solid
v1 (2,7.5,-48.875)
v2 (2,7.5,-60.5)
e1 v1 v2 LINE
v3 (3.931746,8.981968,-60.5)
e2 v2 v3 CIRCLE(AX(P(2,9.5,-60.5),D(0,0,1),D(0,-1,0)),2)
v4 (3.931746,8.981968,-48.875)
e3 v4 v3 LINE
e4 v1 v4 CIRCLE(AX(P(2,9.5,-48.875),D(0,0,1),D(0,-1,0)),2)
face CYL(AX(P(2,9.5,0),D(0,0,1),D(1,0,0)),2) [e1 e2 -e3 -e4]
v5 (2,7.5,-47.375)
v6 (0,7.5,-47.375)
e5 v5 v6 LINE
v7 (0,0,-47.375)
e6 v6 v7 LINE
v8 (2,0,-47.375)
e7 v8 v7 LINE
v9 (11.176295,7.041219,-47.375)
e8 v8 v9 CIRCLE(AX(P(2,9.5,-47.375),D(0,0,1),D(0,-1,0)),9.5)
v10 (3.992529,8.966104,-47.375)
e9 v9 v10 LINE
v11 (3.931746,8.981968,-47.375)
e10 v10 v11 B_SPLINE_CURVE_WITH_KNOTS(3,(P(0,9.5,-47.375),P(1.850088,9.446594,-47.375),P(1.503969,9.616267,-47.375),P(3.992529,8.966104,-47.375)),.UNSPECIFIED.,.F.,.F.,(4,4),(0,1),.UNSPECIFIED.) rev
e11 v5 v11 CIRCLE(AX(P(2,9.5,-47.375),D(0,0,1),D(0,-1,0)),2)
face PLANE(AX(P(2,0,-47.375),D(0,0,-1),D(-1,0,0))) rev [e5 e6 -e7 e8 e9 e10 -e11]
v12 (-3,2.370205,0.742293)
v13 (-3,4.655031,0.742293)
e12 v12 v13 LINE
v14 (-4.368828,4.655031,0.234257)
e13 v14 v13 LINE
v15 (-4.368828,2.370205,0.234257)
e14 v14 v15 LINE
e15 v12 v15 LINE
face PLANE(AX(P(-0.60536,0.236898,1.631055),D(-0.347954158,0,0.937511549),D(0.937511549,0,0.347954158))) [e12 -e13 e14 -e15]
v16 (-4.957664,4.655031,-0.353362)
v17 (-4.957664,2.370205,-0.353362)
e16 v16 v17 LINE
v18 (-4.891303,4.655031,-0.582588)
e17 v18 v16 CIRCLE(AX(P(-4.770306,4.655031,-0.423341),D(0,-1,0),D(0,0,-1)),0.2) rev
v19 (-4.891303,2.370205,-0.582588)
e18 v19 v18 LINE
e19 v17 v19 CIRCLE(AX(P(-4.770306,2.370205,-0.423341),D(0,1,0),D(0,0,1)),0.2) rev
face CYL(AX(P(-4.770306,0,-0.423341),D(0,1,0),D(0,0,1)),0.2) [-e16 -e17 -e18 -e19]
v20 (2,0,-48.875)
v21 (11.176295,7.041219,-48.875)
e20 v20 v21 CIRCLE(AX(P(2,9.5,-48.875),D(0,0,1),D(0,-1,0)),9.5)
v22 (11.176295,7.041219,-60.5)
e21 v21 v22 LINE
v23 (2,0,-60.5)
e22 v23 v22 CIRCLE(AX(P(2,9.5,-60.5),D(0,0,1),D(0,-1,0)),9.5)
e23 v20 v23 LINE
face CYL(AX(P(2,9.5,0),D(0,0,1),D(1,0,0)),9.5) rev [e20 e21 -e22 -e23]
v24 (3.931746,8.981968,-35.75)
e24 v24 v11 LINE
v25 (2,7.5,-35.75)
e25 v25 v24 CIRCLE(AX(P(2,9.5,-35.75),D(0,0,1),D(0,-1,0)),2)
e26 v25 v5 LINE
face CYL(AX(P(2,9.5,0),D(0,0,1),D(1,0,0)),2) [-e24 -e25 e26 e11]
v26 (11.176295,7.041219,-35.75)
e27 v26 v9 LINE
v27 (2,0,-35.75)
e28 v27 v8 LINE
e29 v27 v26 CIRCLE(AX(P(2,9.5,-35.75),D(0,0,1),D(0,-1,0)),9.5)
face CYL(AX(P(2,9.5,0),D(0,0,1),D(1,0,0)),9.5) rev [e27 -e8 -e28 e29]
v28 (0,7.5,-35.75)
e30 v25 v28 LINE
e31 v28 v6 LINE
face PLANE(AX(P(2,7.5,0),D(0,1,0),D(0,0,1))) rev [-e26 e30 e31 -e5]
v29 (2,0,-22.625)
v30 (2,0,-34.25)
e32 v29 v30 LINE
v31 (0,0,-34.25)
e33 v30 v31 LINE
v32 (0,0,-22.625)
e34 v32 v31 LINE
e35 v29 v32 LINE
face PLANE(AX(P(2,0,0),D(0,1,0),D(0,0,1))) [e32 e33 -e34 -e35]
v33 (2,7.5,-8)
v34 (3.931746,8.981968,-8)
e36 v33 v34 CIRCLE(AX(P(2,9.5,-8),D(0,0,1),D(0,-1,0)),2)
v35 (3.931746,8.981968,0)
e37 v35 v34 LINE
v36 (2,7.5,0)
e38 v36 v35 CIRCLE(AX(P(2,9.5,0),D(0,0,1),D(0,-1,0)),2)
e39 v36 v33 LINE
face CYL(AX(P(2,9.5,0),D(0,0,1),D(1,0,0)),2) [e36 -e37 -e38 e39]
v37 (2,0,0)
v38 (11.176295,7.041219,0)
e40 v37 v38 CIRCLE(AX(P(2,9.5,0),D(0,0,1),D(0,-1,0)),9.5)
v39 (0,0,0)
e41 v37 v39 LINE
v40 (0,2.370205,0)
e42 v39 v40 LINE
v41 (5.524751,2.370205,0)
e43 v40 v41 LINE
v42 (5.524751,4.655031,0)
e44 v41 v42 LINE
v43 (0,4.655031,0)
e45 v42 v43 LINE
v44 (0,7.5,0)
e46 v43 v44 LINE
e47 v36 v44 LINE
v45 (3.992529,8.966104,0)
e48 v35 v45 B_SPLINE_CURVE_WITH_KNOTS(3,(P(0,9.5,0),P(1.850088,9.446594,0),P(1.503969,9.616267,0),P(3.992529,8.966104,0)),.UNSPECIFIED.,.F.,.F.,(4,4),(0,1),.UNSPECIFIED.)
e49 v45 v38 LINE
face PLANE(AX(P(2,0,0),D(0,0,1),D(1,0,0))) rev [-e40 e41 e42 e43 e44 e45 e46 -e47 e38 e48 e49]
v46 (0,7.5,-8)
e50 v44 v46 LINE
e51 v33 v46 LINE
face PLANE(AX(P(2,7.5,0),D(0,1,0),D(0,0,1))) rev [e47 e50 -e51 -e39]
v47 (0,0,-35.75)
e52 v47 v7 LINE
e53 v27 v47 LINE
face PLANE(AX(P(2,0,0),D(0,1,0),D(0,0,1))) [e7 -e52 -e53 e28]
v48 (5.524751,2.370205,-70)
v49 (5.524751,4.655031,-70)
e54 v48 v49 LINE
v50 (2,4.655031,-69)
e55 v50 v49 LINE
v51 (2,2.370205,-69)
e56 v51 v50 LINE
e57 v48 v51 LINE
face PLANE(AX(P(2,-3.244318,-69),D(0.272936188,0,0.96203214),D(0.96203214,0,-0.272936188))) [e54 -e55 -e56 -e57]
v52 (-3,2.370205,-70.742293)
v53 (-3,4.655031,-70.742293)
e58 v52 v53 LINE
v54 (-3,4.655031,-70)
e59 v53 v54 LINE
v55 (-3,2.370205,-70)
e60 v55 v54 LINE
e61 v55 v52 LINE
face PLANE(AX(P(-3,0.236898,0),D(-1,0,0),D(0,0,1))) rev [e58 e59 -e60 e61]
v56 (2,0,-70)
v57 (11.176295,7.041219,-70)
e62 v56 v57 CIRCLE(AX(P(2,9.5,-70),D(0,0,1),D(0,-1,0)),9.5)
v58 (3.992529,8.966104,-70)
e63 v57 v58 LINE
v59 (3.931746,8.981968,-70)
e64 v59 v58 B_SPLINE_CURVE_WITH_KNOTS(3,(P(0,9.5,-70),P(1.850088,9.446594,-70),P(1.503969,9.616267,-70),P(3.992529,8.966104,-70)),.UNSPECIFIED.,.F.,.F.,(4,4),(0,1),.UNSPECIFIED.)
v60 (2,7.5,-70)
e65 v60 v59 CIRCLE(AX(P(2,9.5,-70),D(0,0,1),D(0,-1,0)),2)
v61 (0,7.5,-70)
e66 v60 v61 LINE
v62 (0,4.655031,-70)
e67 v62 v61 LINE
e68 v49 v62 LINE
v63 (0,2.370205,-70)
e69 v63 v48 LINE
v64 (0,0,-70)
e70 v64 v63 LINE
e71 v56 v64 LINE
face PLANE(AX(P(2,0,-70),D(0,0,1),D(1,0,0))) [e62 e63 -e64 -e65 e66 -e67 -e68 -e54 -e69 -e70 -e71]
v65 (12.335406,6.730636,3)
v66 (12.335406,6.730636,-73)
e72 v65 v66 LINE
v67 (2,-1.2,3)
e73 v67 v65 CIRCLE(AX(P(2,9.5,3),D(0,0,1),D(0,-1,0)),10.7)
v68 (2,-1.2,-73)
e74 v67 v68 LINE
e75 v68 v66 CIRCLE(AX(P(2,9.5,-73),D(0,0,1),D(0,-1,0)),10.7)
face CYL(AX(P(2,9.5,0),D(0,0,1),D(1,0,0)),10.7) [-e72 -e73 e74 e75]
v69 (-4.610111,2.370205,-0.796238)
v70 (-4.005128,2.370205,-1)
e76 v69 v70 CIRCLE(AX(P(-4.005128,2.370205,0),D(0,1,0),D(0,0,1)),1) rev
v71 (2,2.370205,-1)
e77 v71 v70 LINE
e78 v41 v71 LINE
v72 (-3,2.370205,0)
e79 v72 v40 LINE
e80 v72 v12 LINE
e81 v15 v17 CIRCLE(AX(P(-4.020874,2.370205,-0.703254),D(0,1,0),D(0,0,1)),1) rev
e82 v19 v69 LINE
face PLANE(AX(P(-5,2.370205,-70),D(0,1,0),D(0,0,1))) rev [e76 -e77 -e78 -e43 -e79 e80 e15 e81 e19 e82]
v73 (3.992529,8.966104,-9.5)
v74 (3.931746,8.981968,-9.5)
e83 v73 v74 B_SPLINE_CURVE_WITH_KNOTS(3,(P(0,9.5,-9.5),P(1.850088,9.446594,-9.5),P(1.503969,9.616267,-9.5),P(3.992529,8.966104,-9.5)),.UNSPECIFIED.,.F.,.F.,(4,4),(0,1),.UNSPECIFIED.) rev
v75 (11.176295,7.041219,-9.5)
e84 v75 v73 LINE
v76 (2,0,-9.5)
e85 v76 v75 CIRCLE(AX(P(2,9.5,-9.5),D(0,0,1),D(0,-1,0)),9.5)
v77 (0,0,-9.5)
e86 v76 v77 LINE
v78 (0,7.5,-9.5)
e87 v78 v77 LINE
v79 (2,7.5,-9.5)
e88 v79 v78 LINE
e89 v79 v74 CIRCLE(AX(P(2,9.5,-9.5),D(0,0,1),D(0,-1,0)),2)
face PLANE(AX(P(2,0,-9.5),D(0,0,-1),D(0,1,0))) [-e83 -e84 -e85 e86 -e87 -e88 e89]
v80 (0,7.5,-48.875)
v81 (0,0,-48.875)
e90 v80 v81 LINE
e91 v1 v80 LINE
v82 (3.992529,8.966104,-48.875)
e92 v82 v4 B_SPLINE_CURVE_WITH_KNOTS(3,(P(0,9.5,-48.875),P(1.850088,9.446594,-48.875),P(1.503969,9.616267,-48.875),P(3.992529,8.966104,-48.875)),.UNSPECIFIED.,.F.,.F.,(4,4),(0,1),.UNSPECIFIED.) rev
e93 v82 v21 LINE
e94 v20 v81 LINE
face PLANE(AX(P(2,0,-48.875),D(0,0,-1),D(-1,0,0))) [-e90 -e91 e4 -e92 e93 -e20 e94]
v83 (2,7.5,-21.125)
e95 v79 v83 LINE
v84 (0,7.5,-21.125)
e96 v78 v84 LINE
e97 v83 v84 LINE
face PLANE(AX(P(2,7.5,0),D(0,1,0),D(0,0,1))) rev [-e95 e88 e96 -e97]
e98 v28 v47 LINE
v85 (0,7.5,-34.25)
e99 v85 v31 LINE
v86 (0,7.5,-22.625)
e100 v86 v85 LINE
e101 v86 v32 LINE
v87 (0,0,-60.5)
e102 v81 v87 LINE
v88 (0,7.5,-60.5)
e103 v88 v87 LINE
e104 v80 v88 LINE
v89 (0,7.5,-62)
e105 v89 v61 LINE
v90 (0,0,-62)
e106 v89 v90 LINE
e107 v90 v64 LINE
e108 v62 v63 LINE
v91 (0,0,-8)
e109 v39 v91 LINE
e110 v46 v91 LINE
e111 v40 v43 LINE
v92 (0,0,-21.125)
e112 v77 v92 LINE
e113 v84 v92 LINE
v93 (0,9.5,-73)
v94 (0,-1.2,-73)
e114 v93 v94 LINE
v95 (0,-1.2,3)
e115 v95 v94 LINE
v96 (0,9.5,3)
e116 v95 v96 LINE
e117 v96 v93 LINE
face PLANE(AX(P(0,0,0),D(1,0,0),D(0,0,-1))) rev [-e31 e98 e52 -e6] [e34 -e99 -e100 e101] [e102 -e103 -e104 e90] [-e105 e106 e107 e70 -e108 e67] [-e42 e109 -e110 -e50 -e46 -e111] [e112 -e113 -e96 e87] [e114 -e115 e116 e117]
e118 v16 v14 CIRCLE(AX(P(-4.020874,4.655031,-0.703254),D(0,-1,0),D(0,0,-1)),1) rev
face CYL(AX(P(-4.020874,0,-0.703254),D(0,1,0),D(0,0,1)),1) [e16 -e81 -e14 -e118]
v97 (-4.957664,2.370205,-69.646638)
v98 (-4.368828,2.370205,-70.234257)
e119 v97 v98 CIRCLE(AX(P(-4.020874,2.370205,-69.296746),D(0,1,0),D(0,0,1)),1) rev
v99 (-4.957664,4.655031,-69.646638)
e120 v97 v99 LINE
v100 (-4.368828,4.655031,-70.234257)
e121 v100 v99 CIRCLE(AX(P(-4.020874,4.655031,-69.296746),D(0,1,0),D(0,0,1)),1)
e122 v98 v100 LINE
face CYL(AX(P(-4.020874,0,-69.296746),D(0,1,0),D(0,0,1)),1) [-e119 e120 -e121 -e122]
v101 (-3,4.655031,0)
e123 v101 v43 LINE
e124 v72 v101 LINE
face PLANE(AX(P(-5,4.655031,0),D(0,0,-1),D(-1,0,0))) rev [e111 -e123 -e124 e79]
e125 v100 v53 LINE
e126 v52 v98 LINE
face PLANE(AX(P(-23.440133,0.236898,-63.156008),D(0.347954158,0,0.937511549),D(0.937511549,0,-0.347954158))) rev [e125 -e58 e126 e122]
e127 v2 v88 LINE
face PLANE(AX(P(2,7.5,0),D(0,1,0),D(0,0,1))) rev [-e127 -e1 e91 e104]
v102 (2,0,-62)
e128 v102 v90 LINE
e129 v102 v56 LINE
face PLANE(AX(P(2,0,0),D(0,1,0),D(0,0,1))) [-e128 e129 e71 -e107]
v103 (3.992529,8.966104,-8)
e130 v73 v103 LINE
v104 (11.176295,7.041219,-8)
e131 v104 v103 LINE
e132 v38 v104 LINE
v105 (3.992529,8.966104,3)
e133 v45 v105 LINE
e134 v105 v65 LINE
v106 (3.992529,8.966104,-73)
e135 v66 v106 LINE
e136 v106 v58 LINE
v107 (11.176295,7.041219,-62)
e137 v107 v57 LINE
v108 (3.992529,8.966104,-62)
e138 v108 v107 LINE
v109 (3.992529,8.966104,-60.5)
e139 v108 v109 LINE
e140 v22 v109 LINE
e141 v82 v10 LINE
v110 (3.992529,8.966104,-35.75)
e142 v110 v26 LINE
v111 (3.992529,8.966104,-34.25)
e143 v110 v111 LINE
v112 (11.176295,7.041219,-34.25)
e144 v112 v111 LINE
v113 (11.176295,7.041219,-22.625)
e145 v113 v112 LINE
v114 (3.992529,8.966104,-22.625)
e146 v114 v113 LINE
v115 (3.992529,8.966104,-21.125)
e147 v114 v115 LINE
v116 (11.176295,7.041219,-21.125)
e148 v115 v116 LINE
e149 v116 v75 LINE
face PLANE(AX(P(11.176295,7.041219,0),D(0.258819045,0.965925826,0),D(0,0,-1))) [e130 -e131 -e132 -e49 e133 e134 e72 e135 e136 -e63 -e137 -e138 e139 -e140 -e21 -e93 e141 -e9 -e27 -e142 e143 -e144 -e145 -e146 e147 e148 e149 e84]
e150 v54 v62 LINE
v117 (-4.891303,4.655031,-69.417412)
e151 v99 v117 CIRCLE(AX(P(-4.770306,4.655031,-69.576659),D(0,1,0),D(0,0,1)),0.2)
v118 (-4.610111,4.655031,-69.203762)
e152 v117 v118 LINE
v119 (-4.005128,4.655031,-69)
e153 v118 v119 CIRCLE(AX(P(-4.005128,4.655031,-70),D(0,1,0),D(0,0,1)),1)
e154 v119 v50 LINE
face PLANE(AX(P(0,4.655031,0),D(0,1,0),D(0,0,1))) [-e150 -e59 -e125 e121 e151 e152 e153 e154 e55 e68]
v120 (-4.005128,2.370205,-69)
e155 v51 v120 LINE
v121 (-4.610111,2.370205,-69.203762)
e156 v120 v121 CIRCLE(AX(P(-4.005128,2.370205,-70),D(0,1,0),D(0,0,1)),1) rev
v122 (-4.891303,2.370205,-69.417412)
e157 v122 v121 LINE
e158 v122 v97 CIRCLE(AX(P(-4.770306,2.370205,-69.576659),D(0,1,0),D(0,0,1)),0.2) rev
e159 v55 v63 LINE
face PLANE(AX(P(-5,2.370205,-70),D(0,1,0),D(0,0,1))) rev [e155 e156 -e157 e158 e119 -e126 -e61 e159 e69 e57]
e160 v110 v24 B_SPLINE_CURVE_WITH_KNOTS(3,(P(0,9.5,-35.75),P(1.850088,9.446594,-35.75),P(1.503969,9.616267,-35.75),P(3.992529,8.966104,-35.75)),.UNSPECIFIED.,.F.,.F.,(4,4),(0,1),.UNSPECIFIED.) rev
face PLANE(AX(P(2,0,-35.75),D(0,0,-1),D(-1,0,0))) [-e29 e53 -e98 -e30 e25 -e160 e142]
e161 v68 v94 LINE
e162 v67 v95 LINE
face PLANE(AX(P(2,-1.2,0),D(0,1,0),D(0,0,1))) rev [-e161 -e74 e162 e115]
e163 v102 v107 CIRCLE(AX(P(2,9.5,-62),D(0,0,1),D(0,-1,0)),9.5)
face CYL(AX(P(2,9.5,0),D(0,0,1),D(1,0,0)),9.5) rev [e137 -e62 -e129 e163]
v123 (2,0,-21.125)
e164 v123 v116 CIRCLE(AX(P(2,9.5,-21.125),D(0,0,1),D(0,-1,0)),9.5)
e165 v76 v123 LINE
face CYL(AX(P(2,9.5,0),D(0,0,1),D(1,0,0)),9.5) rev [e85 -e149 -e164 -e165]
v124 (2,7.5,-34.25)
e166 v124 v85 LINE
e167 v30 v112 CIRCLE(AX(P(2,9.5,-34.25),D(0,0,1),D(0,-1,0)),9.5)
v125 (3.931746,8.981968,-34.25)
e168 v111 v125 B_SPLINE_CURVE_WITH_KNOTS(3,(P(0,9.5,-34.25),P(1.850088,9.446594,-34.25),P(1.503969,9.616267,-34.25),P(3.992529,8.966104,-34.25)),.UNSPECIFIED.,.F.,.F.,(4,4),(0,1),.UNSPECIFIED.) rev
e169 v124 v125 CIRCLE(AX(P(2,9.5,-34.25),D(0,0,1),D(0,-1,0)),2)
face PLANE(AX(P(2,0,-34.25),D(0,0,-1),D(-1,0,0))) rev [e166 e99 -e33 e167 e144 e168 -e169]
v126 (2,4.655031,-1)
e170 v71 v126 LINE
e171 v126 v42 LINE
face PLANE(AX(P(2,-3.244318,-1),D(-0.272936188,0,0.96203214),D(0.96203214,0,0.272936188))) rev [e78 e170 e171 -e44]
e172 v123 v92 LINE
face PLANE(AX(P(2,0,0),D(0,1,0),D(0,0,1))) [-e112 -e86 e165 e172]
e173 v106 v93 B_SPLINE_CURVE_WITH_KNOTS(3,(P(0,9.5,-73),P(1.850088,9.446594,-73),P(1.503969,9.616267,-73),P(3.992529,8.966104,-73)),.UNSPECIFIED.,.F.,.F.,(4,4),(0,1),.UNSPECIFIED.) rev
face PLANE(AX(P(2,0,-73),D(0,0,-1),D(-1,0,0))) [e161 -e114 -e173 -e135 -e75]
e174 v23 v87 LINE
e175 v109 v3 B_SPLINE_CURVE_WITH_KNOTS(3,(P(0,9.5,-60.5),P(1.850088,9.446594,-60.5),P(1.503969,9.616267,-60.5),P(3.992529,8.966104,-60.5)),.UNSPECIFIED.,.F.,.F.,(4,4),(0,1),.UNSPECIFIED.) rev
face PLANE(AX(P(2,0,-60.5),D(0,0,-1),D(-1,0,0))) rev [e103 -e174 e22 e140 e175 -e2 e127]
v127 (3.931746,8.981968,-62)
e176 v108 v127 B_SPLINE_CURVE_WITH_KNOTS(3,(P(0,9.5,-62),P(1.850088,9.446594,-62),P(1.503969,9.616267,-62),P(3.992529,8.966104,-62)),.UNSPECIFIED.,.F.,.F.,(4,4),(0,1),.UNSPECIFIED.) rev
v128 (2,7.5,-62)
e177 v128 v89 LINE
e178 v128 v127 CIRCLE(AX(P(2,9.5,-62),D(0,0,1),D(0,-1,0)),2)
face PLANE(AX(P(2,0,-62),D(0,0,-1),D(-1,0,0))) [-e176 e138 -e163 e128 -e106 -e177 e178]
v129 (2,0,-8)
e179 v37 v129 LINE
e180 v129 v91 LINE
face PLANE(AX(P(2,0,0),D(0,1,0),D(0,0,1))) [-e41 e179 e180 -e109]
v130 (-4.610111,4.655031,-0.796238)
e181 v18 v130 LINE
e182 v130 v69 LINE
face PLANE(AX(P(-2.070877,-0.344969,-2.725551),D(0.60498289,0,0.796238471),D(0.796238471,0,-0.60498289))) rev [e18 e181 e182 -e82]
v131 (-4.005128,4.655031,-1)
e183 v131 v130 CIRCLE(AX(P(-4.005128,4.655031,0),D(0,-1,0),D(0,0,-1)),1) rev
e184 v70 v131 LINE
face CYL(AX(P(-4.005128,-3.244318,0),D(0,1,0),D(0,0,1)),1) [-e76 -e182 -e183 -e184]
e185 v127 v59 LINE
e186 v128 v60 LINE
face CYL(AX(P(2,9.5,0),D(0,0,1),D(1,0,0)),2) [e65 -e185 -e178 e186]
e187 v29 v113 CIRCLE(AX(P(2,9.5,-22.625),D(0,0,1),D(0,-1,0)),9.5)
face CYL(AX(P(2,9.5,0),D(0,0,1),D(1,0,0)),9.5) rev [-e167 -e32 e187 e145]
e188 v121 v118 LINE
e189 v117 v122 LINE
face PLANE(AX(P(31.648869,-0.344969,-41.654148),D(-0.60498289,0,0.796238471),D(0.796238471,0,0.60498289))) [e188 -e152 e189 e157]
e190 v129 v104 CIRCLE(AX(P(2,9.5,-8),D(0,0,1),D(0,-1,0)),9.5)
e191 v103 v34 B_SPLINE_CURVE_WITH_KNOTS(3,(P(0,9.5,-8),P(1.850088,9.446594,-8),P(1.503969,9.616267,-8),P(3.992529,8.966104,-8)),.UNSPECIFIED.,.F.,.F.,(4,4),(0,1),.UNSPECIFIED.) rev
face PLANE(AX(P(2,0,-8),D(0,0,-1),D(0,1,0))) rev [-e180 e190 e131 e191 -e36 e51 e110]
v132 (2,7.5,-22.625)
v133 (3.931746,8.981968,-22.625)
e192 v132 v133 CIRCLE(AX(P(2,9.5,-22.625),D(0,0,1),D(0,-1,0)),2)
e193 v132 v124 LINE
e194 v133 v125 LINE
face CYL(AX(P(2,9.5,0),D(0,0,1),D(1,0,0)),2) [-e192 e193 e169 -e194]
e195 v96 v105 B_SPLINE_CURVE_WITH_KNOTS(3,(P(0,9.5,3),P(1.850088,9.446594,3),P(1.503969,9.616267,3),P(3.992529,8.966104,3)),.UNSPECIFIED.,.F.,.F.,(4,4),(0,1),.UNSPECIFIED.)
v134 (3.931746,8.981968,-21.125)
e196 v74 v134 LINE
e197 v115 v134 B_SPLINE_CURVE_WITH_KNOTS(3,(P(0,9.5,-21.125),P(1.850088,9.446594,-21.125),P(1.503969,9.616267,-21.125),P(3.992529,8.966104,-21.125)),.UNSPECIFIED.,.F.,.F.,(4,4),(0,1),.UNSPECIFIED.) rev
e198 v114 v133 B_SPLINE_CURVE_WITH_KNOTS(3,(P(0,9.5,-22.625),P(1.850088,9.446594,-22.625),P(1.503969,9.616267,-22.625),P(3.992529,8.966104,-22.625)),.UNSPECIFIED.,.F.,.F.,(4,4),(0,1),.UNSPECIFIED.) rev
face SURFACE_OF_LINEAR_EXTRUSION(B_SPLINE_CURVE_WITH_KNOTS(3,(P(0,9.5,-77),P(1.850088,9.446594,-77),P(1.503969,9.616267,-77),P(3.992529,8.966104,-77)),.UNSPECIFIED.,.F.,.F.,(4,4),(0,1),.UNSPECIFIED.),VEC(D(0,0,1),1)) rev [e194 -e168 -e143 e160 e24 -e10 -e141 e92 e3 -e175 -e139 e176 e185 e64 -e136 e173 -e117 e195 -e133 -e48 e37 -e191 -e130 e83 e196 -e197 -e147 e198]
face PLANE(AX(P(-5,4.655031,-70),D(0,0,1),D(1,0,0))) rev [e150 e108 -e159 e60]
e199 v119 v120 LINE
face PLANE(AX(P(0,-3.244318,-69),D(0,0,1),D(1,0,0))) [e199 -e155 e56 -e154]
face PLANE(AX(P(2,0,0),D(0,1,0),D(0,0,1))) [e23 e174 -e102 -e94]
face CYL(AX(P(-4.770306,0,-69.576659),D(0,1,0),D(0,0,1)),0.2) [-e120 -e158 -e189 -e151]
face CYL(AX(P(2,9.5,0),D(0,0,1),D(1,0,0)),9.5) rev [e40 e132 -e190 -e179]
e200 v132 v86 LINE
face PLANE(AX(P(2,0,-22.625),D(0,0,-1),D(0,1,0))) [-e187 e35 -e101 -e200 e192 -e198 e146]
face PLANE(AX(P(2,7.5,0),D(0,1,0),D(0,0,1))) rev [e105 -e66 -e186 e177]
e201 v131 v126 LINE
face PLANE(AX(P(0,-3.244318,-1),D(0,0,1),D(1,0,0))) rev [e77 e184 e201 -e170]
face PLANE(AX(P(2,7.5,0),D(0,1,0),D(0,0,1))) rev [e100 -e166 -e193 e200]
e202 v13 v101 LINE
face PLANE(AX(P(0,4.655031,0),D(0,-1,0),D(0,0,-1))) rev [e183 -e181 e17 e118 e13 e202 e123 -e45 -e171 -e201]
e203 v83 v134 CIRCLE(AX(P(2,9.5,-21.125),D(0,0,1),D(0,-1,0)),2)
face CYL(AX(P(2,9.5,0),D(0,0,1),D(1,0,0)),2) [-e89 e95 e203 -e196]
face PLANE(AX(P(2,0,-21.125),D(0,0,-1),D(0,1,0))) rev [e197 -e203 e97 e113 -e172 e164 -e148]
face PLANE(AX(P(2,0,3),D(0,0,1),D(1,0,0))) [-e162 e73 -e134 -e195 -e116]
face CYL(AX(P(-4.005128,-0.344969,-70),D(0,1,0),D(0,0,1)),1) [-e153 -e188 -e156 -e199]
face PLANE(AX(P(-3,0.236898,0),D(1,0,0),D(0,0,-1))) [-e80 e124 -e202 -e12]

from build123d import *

# Parameters (mm, degrees)
SKETCH1_W             = 70
SKETCH1_H             = 7.5
SKETCH1_W_2           = 1.5
BOSS_EXTRUDE1_DEPTH   = 2
SWEEP1_START          = -73
SWEEP1_DEPTH          = 76
SWEEP1_2_DEPTH        = 3
SWEEP1_3_DEPTH        = 3
SWEEP1_START_2        = -62
SWEEP1_4_DEPTH        = 1.5
SWEEP1_START_3        = -48.875
SWEEP1_5_DEPTH        = 1.5
SWEEP1_START_4        = -35.75
SWEEP1_6_DEPTH        = 1.5
SWEEP1_START_5        = -22.625
SWEEP1_7_DEPTH        = 1.5
SWEEP1_START_6        = -9.5
SWEEP1_8_DEPTH        = 1.5
CUT_EXTRUDE1_DEPTH    = 80
SKETCH4_W             = 1
SKETCH4_H             = 2.284825157
BOSS_EXTRUDE2_DEPTH   = 5
BOSS_EXTRUDE2_2_DEPTH = 5
CUT_EXTRUDE2_DEPTH    = 5
BOSS_EXTRUDE3_DEPTH   = 2.284825157
BOSS_EXTRUDE4_DEPTH   = 2.284825157
FILLET1_R             = 1
FILLET2_R             = 0.2


# Read off the part's stored shape, not the designer's step: Sweep1
with BuildPart() as part:
    # Sketch1 → Boss-Extrude1 (new body)
    # profile 1 of 6: a face of its own
    with BuildSketch(Plane(origin=(0, 0, 0), x_dir=(0, 0, -1), z_dir=(1, 0, 0))):
        Polygon((73, 9.5), (73, 7.5), (73, 0), (73, -1.2), (70, -1.2), (-3, -1.2), (-3, 9.5), (70, 9.5), align=None)
        with Locations((35, 3.75)):
            Rectangle(SKETCH1_W, SKETCH1_H, mode=Mode.SUBTRACT)
    # profile 2 of 6: a face of its own
    with BuildSketch(Plane(origin=(0, 0, 0), x_dir=(0, 0, -1), z_dir=(1, 0, 0))):
        with Locations((8.75, 3.75)):
            Rectangle(SKETCH1_W_2, SKETCH1_H)
    # profile 3 of 6: a face of its own
    with BuildSketch(Plane(origin=(0, 0, 0), x_dir=(0, 0, -1), z_dir=(1, 0, 0))):
        with Locations((21.875, 3.75)):
            Rectangle(SKETCH1_W_2, SKETCH1_H)
    # profile 4 of 6: a face of its own
    with BuildSketch(Plane(origin=(0, 0, 0), x_dir=(0, 0, -1), z_dir=(1, 0, 0))):
        with Locations((35, 3.75)):
            Rectangle(SKETCH1_W_2, SKETCH1_H)
    # profile 5 of 6: a face of its own
    with BuildSketch(Plane(origin=(0, 0, 0), x_dir=(0, 0, -1), z_dir=(1, 0, 0))):
        with Locations((48.125, 3.75)):
            Rectangle(SKETCH1_W_2, SKETCH1_H)
    # profile 6 of 6: a face of its own
    with BuildSketch(Plane(origin=(0, 0, 0), x_dir=(0, 0, -1), z_dir=(1, 0, 0))):
        with Locations((61.25, 3.75)):
            Rectangle(SKETCH1_W_2, SKETCH1_H)
    extrude(amount=BOSS_EXTRUDE1_DEPTH)

    # Sweep1 outline → Sweep1 (add)
    with BuildSketch(Plane.XY.offset(SWEEP1_START)):
        with BuildLine():
            Line((2, 0), (2, -1.2))
            ThreePointArc((2, -1.2), (8.51374729, 1.011119259), (12.335406341, 6.730636217))
            Line((12.335406341, 6.730636217), (11.17629535, 7.041219072))
            ThreePointArc((11.17629535, 7.041219072), (7.783233576, 1.963143267), (2, 0))
        make_face()
        with BuildLine():
            Line((2, 9.5), (2, 7.5))
            ThreePointArc((2, 7.5), (3.217522858, 7.913293319), (3.931851653, 8.98236191))
            Line((3.931851653, 8.98236191), (2, 9.5))
        make_face()
    extrude(amount=SWEEP1_DEPTH)

    # Sweep1 2 outline → Sweep1 2 (add)
    with BuildSketch(Plane.XY.offset(SWEEP1_START)):
        with BuildLine():
            Line((2, 7.5), (2, 0))
            ThreePointArc((2, 0), (7.783233576, 1.963143267), (11.17629535, 7.041219072))
            Line((11.17629535, 7.041219072), (3.931851653, 8.98236191))
            ThreePointArc((3.931851653, 8.98236191), (3.217522858, 7.913293319), (2, 7.5))
        make_face()
    extrude(amount=SWEEP1_2_DEPTH)

    # Sweep1 3 outline → Sweep1 3 (add)
    with BuildSketch(Plane.XY):
        with BuildLine():
            Line((2, 7.5), (2, 0))
            ThreePointArc((2, 0), (7.783233576, 1.963143267), (11.17629535, 7.041219072))
            Line((11.17629535, 7.041219072), (3.931851653, 8.98236191))
            ThreePointArc((3.931851653, 8.98236191), (3.217522858, 7.913293319), (2, 7.5))
        make_face()
    extrude(amount=SWEEP1_3_DEPTH)

    # Sweep1 4 outline → Sweep1 4 (add)
    with BuildSketch(Plane.XY.offset(SWEEP1_START_2)):
        with BuildLine():
            Line((2, 7.5), (2, 0))
            ThreePointArc((2, 0), (7.783233576, 1.963143267), (11.17629535, 7.041219072))
            Line((11.17629535, 7.041219072), (3.931851653, 8.98236191))
            ThreePointArc((3.931851653, 8.98236191), (3.217522858, 7.913293319), (2, 7.5))
        make_face()
    extrude(amount=SWEEP1_4_DEPTH)

    # Sweep1 5 outline → Sweep1 5 (add)
    with BuildSketch(Plane.XY.offset(SWEEP1_START_3)):
        with BuildLine():
            Line((2, 7.5), (2, 0))
            ThreePointArc((2, 0), (7.783233576, 1.963143267), (11.17629535, 7.041219072))
            Line((11.17629535, 7.041219072), (3.931851653, 8.98236191))
            ThreePointArc((3.931851653, 8.98236191), (3.217522858, 7.913293319), (2, 7.5))
        make_face()
    extrude(amount=SWEEP1_5_DEPTH)

    # Sweep1 6 outline → Sweep1 6 (add)
    with BuildSketch(Plane.XY.offset(SWEEP1_START_4)):
        with BuildLine():
            Line((2, 7.5), (2, 0))
            ThreePointArc((2, 0), (7.783233576, 1.963143267), (11.17629535, 7.041219072))
            Line((11.17629535, 7.041219072), (3.931851653, 8.98236191))
            ThreePointArc((3.931851653, 8.98236191), (3.217522858, 7.913293319), (2, 7.5))
        make_face()
    extrude(amount=SWEEP1_6_DEPTH)

    # Sweep1 7 outline → Sweep1 7 (add)
    with BuildSketch(Plane.XY.offset(SWEEP1_START_5)):
        with BuildLine():
            Line((2, 7.5), (2, 0))
            ThreePointArc((2, 0), (7.783233576, 1.963143267), (11.17629535, 7.041219072))
            Line((11.17629535, 7.041219072), (3.931851653, 8.98236191))
            ThreePointArc((3.931851653, 8.98236191), (3.217522858, 7.913293319), (2, 7.5))
        make_face()
    extrude(amount=SWEEP1_7_DEPTH)

    # Sweep1 8 outline → Sweep1 8 (add)
    with BuildSketch(Plane.XY.offset(SWEEP1_START_6)):
        with BuildLine():
            Line((2, 7.5), (2, 0))
            ThreePointArc((2, 0), (7.783233576, 1.963143267), (11.17629535, 7.041219072))
            Line((11.17629535, 7.041219072), (3.931851653, 8.98236191))
            ThreePointArc((3.931851653, 8.98236191), (3.217522858, 7.913293319), (2, 7.5))
        make_face()
    extrude(amount=SWEEP1_8_DEPTH)

    # Sketch3 → Cut-Extrude1 (cut)
    with BuildSketch(Plane.XY.offset(3)):
        with BuildLine():
            add(Edge.make_bspline(
                [(0, 9.5), (1.85008807, 9.446594219), (1.503968772, 9.616267019), (3.992528633, 8.966103562)],
                knots=[0, 0, 0, 0, 1, 1, 1, 1], degree=3))
            Line((3.992528633, 8.966103562), (2, 9.5))
            Line((2, 9.5), (0, 9.5))
        make_face()
    extrude(amount=-CUT_EXTRUDE1_DEPTH, mode=Mode.SUBTRACT)



with BuildPart() as body_2:
    # Sketch4 → Boss-Extrude2 (new body)
    with BuildSketch(Plane.ZY):
        with Locations((-69.5, 3.512617973)):
            Rectangle(SKETCH4_W, SKETCH4_H)
    extrude(amount=BOSS_EXTRUDE2_DEPTH)


with BuildPart() as body_3:
    # Sketch4 → Boss-Extrude2 2 (new body)
    with BuildSketch(Plane.ZY):
        with Locations((-0.5, 3.512617973)):
            Rectangle(SKETCH4_W, SKETCH4_H)
    extrude(amount=BOSS_EXTRUDE2_2_DEPTH)


with BuildPart() as cut_extrude2_tool:
    # Sketch5 → Cut-Extrude2 (new body)
    with BuildSketch(Plane(origin=(0, 4.655030551, 0), x_dir=(1, 0, 0), z_dir=(0, 1, 0))):
        Polygon((-4.341933066, 69), (-5, 69.5), (-5, 69), align=None)
        Polygon((-5, 1), (-5, 0.5), (-4.341933066, 1), align=None)
    extrude(amount=-CUT_EXTRUDE2_DEPTH)


with BuildPart() as body_2_1:
    add(body_2.part)

    # Cut-Extrude2: cut by cut_extrude2_tool
    add(cut_extrude2_tool.part, mode=Mode.SUBTRACT)



with BuildPart() as body_3_1:
    add(body_3.part)

    # Cut-Extrude2: cut by cut_extrude2_tool
    add(cut_extrude2_tool.part, mode=Mode.SUBTRACT)


with BuildPart() as body_2_2:
    add(body_2_1.part)

    add(body_3_1.part)  # Boss-Extrude3 merges body 3
    # Sketch6 → Boss-Extrude3 (add)
    with BuildSketch(Plane(origin=(0, 4.655030551, 0), x_dir=(1, 0, 0), z_dir=(0, 1, 0))):
        Polygon((-3, 70.742293059), (-5, 70), (-3, 70), align=None)
        Polygon((-3, 0), (-5, 0), (-3, -0.742293059), align=None)
    extrude(amount=-BOSS_EXTRUDE3_DEPTH)


with BuildPart() as part_1:
    add(part.part)

    add(body_2_2.part)  # Boss-Extrude4 merges body 2
    # Sketch7 → Boss-Extrude4 (add)
    with BuildSketch(Plane(origin=(0, 4.655030551, 0), x_dir=(1, 0, 0), z_dir=(0, 1, 0))):
        Polygon((0, 69), (2, 69), (5.524751143, 70), (0, 70), align=None)
        Polygon((0, 0), (0, 1), (2, 1), (5.524751143, 0), align=None)
    extrude(amount=-BOSS_EXTRUDE4_DEPTH)

    # Fillet1
    # the kernel refuses this fillet: 1 mm, written as the material it takes off along each edge
    with BuildSketch(Plane(origin=(-4.341933066, 5.497044152, -69), x_dir=(1, 0, 0), z_dir=(0, -1, 0))) as fillet1_piece_1:
        with BuildLine():
            CenterArc((FILLET1_R * 0.336805440666, -FILLET1_R), FILLET1_R, 90, 37.22761065)
            Line((-FILLET1_R * 0.268177449166, -FILLET1_R * 0.203761528805), (-FILLET1_R * 0.280277106962, -FILLET1_R * 0.187836759381))
            Line((-FILLET1_R * 0.280277106962, -FILLET1_R * 0.187836759381), (-FILLET1_R * 0.00673610881331, FILLET1_R * 0.02))
            Line((-FILLET1_R * 0.00673610881331, FILLET1_R * 0.02), (FILLET1_R * 0.336805440666, FILLET1_R * 0.02))
            Line((FILLET1_R * 0.336805440666, FILLET1_R * 0.02), (FILLET1_R * 0.336805440666, 0))
        make_face()
    extrude(amount=3.96885236, mode=Mode.SUBTRACT)
    with BuildSketch(Plane(origin=(-5, 0.687101271, -70), x_dir=(0, 0, 1), z_dir=(0, 1, 0))) as fillet1_piece_2:
        with BuildLine():
            CenterArc((0.703254318, 0.979125979), FILLET1_R, 200.362233207, 57.910439257)
            Line((-0.234257231, 0.631171821), (-0.253007462, 0.624212738))
            Line((-0.253007462, 0.624212738), (-0.018750231, -0.006959083))
            Line((-0.018750231, -0.006959083), (0, -0.02))
            ThreePointArc((0, -0.02), (0.25, -0.02), (0.495934914, -0.01958252))
            Line((0.495934914, -0.01958252), (0.5, 0))
        make_face()
    extrude(amount=5.651033402, mode=Mode.SUBTRACT)
    with BuildSketch(Plane(origin=(-5, 0.687101271, 0), x_dir=(0, 0, -1), z_dir=(0, 1, 0))) as fillet1_piece_3:
        with BuildLine():
            CenterArc((0.703254318, -0.979125979), FILLET1_R, 101.727327536, 57.910439257)
            Line((-0.234257231, -0.631171821), (-0.253007462, -0.624212738))
            Line((-0.253007462, -0.624212738), (-0.018750231, 0.006959083))
            Line((-0.018750231, 0.006959083), (0, 0.02))
            ThreePointArc((0, 0.02), (0.25, 0.02), (0.495934914, 0.01958252))
            Line((0.495934914, 0.01958252), (0.5, 0))
        make_face()
    extrude(amount=5.651033402, mode=Mode.SUBTRACT)
    with BuildSketch(Plane(origin=(-4.341933066, 5.497044152, -1), x_dir=(1, 0, 0), z_dir=(0, -1, 0))) as fillet1_piece_4:
        with BuildLine():
            CenterArc((FILLET1_R * 0.336805440666, FILLET1_R), FILLET1_R, 232.77238935, 37.22761065)
            Line((-FILLET1_R * 0.268177449166, FILLET1_R * 0.203761528805), (-FILLET1_R * 0.280277106962, FILLET1_R * 0.187836759381))
            Line((-FILLET1_R * 0.280277106962, FILLET1_R * 0.187836759381), (-FILLET1_R * 0.00673610881331, -FILLET1_R * 0.02))
            Line((-FILLET1_R * 0.00673610881331, -FILLET1_R * 0.02), (FILLET1_R * 0.336805440666, -FILLET1_R * 0.02))
            Line((FILLET1_R * 0.336805440666, -FILLET1_R * 0.02), (FILLET1_R * 0.336805440666, 0))
        make_face()
    extrude(amount=3.96885236, mode=Mode.SUBTRACT)

    # Fillet2
    fillet2_edges = [part_1.edges().sort_by_distance(p)[0] for p in [
        (-5, 3.512617972, -69.5),
        (-5, 3.512617972, -0.5),
    ]]
    fillet(fillet2_edges, radius=FILLET2_R)


solid = part_1.part
